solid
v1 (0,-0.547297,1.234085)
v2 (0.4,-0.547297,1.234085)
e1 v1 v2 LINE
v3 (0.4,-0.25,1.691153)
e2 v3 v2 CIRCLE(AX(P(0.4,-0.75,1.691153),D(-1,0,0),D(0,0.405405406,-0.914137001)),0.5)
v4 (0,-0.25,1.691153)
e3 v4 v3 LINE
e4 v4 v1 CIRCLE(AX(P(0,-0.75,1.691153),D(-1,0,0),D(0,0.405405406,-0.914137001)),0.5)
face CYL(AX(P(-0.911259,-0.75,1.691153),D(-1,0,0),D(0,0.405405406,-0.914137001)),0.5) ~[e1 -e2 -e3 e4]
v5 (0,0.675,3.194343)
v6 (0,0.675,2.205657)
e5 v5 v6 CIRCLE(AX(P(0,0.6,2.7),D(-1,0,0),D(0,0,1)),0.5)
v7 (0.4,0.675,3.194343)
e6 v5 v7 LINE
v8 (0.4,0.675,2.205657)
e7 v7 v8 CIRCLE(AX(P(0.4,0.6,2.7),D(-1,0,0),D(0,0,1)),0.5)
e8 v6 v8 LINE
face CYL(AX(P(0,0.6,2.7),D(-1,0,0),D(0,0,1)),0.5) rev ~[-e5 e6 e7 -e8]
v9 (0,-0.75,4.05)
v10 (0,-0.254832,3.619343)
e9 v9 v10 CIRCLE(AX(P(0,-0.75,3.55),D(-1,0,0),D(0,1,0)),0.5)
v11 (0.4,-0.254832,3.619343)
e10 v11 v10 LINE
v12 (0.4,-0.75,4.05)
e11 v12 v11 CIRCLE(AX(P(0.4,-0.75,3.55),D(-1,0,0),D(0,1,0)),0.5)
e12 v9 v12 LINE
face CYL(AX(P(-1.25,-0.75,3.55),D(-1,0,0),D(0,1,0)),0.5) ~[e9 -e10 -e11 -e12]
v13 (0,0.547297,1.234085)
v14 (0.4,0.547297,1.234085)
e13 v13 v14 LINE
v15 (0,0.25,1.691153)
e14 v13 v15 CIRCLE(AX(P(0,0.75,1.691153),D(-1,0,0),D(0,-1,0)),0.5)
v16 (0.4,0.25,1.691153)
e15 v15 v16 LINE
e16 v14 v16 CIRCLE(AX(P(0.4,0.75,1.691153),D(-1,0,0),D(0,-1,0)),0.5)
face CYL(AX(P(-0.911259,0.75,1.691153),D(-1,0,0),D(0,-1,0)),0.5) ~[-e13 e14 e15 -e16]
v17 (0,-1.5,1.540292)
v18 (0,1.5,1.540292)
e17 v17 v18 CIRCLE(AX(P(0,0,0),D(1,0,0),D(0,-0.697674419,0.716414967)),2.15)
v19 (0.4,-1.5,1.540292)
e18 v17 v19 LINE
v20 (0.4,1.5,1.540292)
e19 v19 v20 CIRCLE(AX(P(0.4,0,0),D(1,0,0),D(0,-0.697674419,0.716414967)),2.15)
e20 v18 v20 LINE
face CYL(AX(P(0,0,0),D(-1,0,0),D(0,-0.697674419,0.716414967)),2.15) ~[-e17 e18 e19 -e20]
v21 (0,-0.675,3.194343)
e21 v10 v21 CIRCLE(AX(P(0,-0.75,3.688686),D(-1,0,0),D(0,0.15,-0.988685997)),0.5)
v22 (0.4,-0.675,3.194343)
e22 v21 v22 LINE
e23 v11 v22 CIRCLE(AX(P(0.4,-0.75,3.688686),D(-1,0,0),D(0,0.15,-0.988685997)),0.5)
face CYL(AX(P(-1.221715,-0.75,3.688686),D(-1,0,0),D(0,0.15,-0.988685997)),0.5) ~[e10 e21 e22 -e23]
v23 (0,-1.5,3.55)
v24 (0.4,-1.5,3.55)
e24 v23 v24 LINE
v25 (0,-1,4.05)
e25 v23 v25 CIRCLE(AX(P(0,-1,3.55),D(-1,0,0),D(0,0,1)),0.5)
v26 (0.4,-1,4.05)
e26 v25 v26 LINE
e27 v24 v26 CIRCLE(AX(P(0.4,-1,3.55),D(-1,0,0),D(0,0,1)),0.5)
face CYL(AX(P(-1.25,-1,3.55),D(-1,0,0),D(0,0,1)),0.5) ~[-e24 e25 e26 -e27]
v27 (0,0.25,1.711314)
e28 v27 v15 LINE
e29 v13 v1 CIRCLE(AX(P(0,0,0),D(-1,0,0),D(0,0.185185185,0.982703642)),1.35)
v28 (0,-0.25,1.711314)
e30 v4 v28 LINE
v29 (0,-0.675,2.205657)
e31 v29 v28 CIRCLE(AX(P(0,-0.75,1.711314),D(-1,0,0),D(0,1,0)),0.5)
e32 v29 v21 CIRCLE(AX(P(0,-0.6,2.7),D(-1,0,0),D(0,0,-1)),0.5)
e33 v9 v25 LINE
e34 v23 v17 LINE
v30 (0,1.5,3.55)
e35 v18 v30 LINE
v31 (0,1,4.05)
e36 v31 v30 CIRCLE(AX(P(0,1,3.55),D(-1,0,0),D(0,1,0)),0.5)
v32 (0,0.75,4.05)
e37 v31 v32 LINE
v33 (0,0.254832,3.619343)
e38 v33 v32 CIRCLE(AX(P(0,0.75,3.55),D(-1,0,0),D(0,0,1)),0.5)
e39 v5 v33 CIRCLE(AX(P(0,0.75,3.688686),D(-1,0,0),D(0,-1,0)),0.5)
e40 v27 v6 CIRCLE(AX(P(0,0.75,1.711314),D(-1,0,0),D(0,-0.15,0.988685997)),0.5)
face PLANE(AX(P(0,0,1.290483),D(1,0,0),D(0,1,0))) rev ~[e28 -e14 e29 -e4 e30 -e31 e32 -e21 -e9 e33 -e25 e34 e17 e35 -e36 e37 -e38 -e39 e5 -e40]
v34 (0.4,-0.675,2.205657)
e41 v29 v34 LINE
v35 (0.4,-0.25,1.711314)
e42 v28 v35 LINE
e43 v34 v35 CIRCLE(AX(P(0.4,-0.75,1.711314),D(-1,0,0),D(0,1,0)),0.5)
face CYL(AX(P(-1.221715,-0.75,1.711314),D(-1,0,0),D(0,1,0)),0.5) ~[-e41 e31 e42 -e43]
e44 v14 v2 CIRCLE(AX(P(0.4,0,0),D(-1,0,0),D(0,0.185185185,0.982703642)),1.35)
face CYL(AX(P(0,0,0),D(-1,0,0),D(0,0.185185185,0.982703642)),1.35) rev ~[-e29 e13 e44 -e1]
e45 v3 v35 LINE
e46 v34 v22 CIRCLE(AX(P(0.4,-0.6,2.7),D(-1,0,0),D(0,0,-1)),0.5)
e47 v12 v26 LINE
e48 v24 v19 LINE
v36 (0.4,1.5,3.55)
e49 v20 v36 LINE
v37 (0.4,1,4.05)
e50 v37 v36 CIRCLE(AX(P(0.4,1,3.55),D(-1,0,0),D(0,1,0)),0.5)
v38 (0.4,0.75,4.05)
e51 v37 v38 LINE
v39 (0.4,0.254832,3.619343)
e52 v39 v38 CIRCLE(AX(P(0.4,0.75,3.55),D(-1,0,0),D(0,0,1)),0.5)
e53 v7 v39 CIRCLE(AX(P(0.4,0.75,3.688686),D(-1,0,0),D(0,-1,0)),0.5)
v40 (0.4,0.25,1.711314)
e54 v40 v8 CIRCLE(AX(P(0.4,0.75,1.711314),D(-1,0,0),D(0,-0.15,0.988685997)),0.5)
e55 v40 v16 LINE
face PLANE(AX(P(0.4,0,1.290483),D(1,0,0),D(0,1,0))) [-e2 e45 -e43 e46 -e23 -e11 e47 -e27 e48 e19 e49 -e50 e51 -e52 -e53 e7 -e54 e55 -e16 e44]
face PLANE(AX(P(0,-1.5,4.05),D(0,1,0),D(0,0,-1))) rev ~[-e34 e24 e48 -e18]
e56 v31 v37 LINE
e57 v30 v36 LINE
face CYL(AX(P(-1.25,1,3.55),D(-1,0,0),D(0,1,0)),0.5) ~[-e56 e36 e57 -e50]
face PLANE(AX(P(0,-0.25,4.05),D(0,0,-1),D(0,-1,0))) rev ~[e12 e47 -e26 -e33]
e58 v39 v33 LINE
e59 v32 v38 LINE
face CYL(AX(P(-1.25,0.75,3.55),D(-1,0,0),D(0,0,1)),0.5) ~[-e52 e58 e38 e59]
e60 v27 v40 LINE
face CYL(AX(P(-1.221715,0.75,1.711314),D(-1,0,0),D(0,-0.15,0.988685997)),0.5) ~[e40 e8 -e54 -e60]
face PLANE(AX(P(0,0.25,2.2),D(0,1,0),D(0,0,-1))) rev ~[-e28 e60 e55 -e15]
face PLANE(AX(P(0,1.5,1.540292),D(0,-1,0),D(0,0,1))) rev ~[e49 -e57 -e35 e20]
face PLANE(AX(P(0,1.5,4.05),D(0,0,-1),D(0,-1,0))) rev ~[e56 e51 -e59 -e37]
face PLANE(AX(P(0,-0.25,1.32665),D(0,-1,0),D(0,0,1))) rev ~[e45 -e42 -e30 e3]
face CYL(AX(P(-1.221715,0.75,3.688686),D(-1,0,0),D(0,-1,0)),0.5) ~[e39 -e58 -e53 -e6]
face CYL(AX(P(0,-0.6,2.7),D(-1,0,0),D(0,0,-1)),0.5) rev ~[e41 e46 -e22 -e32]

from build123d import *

# Parameters (mm, degrees)
F1_DEPTH    = 0.4
F2_T1_DEPTH = 2.9
F2_T3_DEPTH = 2.8434299833
F2_T5_DEPTH = 2.2225176819


# Not quite as in the source:
# - a fillet or chamfer that OpenCascade refuses, or shapes differently, is made with other operations: its cross-section is extruded or revolved along the edge and cut away or added


with BuildPart() as f1:
    # F0 (on Right) → F1 (new body)
    with BuildSketch(Plane.YZ):
        with BuildLine():
            ThreePointArc((0.25, 1.3266499161), (0, -1.35), (-0.25, 1.3266499161))
            Line((-0.25, 1.3266499161), (-0.25, 2.2))
            Line((-0.25, 2.2), (-0.6, 2.2))
            ThreePointArc((-0.6, 2.2), (-1.1, 2.7), (-0.6, 3.2))
            Line((-0.6, 3.2), (-0.25, 3.2))
            Line((-0.25, 3.2), (-0.25, 4.05))
            Line((-0.25, 4.05), (-1.5, 4.05))
            Line((-1.5, 4.05), (-1.5, 1.5402921801))
            ThreePointArc((-1.5, 1.5402921801), (0, -2.15), (1.5, 1.5402921801))
            Line((1.5, 1.5402921801), (1.5, 4.05))
            Line((1.5, 4.05), (0.25, 4.05))
            Line((0.25, 4.05), (0.25, 3.2))
            Line((0.25, 3.2), (0.6, 3.2))
            ThreePointArc((0.6, 3.2), (1.1, 2.7), (0.6, 2.2))
            Line((0.6, 2.2), (0.25, 2.2))
            Line((0.25, 2.2), (0.25, 1.3266499161))
        make_face()
    extrude(amount=F1_DEPTH)

    # F2: fillet of radius 0.5 on 10 edges, made by hand

    # F2_s2 → F2_t1 (cut)
    with BuildSketch(Plane.YZ.offset(-1.25)):
        with BuildLine():
            ThreePointArc((-0.25, 3.55), (-0.3964466094, 3.9035533906), (-0.75, 4.05))
            Line((-0.75, 4.05), (-0.25, 4.05))
            Line((-0.25, 4.05), (-0.25, 3.55))
        make_face()
        with BuildLine():
            ThreePointArc((-1, 4.05), (-1.3535533906, 3.9035533906), (-1.5, 3.55))
            Line((-1.5, 3.55), (-1.5, 4.05))
            Line((-1.5, 4.05), (-1, 4.05))
        make_face()
        with BuildLine():
            ThreePointArc((0.75, 4.05), (0.3964466094, 3.9035533906), (0.25, 3.55))
            Line((0.25, 3.55), (0.25, 4.05))
            Line((0.25, 4.05), (0.75, 4.05))
        make_face()
        with BuildLine():
            ThreePointArc((1.5, 3.55), (1.3535533906, 3.9035533906), (1, 4.05))
            Line((1, 4.05), (1.5, 4.05))
            Line((1.5, 4.05), (1.5, 3.55))
        make_face()
    extrude(amount=F2_T1_DEPTH, mode=Mode.SUBTRACT)

    # F2_s4 → F2_t3 (cut)
    with BuildSketch(Plane.YZ.offset(-1.2217149917)):
        with BuildLine():
            ThreePointArc((-0.675, 3.1943429983), (-0.3708562278, 3.3627258764), (-0.25, 3.6886859967))
            Line((-0.25, 3.6886859967), (-0.2, 3.6886859967))
            Line((-0.2, 3.6886859967), (-0.2, 3.2))
            Line((-0.2, 3.2), (-0.25, 3.15))
            ThreePointArc((-0.25, 3.15), (-0.6, 3.15), (-0.6675, 3.1449086985))
            Line((-0.6675, 3.1449086985), (-0.675, 3.1943429983))
        make_face()
        with BuildLine():
            ThreePointArc((-0.25, 1.7113140033), (-0.3708562278, 2.0372741236), (-0.675, 2.2056570017))
            Line((-0.675, 2.2056570017), (-0.6675, 2.2550913015))
            ThreePointArc((-0.6675, 2.2550913015), (-0.6, 2.25), (-0.25, 2.25))
            Line((-0.25, 2.25), (-0.2, 2.2))
            Line((-0.2, 2.2), (-0.2, 1.7113140033))
            Line((-0.2, 1.7113140033), (-0.25, 1.7113140033))
        make_face()
        with BuildLine():
            ThreePointArc((0.675, 2.2056570017), (0.3708562278, 2.0372741236), (0.25, 1.7113140033))
            Line((0.25, 1.7113140033), (0.2, 1.7113140033))
            Line((0.2, 1.7113140033), (0.2, 2.2))
            Line((0.2, 2.2), (0.25, 2.25))
            ThreePointArc((0.25, 2.25), (0.6, 2.25), (0.6675, 2.2550913015))
            Line((0.6675, 2.2550913015), (0.675, 2.2056570017))
        make_face()
        with BuildLine():
            ThreePointArc((0.25, 3.6886859967), (0.3708562278, 3.3627258764), (0.675, 3.1943429983))
            Line((0.675, 3.1943429983), (0.6675, 3.1449086985))
            ThreePointArc((0.6675, 3.1449086985), (0.6, 3.15), (0.25, 3.15))
            Line((0.25, 3.15), (0.2, 3.2))
            Line((0.2, 3.2), (0.2, 3.6886859967))
            Line((0.2, 3.6886859967), (0.25, 3.6886859967))
        make_face()
    extrude(amount=F2_T3_DEPTH, mode=Mode.SUBTRACT)

    # F2_s6 → F2_t5 (cut)
    with BuildSketch(Plane.YZ.offset(-0.911258841)):
        with BuildLine():
            ThreePointArc((0.25, 1.6911534525), (0.3308631779, 1.4185285741), (0.5472972973, 1.2340849518))
            ThreePointArc((0.5472972973, 1.2340849518), (0.4013263176, 1.2889674886), (0.25, 1.3266499161))
            Line((0.25, 1.3266499161), (0.25, 1.6911534525))
        make_face()
        with BuildLine():
            ThreePointArc((-0.5472972973, 1.2340849518), (-0.3308631779, 1.4185285741), (-0.25, 1.6911534525))
            Line((-0.25, 1.6911534525), (-0.25, 1.3266499161))
            ThreePointArc((-0.25, 1.3266499161), (-0.4013263176, 1.2889674886), (-0.5472972973, 1.2340849518))
        make_face()
    extrude(amount=F2_T5_DEPTH, mode=Mode.SUBTRACT)


solid = f1.part
